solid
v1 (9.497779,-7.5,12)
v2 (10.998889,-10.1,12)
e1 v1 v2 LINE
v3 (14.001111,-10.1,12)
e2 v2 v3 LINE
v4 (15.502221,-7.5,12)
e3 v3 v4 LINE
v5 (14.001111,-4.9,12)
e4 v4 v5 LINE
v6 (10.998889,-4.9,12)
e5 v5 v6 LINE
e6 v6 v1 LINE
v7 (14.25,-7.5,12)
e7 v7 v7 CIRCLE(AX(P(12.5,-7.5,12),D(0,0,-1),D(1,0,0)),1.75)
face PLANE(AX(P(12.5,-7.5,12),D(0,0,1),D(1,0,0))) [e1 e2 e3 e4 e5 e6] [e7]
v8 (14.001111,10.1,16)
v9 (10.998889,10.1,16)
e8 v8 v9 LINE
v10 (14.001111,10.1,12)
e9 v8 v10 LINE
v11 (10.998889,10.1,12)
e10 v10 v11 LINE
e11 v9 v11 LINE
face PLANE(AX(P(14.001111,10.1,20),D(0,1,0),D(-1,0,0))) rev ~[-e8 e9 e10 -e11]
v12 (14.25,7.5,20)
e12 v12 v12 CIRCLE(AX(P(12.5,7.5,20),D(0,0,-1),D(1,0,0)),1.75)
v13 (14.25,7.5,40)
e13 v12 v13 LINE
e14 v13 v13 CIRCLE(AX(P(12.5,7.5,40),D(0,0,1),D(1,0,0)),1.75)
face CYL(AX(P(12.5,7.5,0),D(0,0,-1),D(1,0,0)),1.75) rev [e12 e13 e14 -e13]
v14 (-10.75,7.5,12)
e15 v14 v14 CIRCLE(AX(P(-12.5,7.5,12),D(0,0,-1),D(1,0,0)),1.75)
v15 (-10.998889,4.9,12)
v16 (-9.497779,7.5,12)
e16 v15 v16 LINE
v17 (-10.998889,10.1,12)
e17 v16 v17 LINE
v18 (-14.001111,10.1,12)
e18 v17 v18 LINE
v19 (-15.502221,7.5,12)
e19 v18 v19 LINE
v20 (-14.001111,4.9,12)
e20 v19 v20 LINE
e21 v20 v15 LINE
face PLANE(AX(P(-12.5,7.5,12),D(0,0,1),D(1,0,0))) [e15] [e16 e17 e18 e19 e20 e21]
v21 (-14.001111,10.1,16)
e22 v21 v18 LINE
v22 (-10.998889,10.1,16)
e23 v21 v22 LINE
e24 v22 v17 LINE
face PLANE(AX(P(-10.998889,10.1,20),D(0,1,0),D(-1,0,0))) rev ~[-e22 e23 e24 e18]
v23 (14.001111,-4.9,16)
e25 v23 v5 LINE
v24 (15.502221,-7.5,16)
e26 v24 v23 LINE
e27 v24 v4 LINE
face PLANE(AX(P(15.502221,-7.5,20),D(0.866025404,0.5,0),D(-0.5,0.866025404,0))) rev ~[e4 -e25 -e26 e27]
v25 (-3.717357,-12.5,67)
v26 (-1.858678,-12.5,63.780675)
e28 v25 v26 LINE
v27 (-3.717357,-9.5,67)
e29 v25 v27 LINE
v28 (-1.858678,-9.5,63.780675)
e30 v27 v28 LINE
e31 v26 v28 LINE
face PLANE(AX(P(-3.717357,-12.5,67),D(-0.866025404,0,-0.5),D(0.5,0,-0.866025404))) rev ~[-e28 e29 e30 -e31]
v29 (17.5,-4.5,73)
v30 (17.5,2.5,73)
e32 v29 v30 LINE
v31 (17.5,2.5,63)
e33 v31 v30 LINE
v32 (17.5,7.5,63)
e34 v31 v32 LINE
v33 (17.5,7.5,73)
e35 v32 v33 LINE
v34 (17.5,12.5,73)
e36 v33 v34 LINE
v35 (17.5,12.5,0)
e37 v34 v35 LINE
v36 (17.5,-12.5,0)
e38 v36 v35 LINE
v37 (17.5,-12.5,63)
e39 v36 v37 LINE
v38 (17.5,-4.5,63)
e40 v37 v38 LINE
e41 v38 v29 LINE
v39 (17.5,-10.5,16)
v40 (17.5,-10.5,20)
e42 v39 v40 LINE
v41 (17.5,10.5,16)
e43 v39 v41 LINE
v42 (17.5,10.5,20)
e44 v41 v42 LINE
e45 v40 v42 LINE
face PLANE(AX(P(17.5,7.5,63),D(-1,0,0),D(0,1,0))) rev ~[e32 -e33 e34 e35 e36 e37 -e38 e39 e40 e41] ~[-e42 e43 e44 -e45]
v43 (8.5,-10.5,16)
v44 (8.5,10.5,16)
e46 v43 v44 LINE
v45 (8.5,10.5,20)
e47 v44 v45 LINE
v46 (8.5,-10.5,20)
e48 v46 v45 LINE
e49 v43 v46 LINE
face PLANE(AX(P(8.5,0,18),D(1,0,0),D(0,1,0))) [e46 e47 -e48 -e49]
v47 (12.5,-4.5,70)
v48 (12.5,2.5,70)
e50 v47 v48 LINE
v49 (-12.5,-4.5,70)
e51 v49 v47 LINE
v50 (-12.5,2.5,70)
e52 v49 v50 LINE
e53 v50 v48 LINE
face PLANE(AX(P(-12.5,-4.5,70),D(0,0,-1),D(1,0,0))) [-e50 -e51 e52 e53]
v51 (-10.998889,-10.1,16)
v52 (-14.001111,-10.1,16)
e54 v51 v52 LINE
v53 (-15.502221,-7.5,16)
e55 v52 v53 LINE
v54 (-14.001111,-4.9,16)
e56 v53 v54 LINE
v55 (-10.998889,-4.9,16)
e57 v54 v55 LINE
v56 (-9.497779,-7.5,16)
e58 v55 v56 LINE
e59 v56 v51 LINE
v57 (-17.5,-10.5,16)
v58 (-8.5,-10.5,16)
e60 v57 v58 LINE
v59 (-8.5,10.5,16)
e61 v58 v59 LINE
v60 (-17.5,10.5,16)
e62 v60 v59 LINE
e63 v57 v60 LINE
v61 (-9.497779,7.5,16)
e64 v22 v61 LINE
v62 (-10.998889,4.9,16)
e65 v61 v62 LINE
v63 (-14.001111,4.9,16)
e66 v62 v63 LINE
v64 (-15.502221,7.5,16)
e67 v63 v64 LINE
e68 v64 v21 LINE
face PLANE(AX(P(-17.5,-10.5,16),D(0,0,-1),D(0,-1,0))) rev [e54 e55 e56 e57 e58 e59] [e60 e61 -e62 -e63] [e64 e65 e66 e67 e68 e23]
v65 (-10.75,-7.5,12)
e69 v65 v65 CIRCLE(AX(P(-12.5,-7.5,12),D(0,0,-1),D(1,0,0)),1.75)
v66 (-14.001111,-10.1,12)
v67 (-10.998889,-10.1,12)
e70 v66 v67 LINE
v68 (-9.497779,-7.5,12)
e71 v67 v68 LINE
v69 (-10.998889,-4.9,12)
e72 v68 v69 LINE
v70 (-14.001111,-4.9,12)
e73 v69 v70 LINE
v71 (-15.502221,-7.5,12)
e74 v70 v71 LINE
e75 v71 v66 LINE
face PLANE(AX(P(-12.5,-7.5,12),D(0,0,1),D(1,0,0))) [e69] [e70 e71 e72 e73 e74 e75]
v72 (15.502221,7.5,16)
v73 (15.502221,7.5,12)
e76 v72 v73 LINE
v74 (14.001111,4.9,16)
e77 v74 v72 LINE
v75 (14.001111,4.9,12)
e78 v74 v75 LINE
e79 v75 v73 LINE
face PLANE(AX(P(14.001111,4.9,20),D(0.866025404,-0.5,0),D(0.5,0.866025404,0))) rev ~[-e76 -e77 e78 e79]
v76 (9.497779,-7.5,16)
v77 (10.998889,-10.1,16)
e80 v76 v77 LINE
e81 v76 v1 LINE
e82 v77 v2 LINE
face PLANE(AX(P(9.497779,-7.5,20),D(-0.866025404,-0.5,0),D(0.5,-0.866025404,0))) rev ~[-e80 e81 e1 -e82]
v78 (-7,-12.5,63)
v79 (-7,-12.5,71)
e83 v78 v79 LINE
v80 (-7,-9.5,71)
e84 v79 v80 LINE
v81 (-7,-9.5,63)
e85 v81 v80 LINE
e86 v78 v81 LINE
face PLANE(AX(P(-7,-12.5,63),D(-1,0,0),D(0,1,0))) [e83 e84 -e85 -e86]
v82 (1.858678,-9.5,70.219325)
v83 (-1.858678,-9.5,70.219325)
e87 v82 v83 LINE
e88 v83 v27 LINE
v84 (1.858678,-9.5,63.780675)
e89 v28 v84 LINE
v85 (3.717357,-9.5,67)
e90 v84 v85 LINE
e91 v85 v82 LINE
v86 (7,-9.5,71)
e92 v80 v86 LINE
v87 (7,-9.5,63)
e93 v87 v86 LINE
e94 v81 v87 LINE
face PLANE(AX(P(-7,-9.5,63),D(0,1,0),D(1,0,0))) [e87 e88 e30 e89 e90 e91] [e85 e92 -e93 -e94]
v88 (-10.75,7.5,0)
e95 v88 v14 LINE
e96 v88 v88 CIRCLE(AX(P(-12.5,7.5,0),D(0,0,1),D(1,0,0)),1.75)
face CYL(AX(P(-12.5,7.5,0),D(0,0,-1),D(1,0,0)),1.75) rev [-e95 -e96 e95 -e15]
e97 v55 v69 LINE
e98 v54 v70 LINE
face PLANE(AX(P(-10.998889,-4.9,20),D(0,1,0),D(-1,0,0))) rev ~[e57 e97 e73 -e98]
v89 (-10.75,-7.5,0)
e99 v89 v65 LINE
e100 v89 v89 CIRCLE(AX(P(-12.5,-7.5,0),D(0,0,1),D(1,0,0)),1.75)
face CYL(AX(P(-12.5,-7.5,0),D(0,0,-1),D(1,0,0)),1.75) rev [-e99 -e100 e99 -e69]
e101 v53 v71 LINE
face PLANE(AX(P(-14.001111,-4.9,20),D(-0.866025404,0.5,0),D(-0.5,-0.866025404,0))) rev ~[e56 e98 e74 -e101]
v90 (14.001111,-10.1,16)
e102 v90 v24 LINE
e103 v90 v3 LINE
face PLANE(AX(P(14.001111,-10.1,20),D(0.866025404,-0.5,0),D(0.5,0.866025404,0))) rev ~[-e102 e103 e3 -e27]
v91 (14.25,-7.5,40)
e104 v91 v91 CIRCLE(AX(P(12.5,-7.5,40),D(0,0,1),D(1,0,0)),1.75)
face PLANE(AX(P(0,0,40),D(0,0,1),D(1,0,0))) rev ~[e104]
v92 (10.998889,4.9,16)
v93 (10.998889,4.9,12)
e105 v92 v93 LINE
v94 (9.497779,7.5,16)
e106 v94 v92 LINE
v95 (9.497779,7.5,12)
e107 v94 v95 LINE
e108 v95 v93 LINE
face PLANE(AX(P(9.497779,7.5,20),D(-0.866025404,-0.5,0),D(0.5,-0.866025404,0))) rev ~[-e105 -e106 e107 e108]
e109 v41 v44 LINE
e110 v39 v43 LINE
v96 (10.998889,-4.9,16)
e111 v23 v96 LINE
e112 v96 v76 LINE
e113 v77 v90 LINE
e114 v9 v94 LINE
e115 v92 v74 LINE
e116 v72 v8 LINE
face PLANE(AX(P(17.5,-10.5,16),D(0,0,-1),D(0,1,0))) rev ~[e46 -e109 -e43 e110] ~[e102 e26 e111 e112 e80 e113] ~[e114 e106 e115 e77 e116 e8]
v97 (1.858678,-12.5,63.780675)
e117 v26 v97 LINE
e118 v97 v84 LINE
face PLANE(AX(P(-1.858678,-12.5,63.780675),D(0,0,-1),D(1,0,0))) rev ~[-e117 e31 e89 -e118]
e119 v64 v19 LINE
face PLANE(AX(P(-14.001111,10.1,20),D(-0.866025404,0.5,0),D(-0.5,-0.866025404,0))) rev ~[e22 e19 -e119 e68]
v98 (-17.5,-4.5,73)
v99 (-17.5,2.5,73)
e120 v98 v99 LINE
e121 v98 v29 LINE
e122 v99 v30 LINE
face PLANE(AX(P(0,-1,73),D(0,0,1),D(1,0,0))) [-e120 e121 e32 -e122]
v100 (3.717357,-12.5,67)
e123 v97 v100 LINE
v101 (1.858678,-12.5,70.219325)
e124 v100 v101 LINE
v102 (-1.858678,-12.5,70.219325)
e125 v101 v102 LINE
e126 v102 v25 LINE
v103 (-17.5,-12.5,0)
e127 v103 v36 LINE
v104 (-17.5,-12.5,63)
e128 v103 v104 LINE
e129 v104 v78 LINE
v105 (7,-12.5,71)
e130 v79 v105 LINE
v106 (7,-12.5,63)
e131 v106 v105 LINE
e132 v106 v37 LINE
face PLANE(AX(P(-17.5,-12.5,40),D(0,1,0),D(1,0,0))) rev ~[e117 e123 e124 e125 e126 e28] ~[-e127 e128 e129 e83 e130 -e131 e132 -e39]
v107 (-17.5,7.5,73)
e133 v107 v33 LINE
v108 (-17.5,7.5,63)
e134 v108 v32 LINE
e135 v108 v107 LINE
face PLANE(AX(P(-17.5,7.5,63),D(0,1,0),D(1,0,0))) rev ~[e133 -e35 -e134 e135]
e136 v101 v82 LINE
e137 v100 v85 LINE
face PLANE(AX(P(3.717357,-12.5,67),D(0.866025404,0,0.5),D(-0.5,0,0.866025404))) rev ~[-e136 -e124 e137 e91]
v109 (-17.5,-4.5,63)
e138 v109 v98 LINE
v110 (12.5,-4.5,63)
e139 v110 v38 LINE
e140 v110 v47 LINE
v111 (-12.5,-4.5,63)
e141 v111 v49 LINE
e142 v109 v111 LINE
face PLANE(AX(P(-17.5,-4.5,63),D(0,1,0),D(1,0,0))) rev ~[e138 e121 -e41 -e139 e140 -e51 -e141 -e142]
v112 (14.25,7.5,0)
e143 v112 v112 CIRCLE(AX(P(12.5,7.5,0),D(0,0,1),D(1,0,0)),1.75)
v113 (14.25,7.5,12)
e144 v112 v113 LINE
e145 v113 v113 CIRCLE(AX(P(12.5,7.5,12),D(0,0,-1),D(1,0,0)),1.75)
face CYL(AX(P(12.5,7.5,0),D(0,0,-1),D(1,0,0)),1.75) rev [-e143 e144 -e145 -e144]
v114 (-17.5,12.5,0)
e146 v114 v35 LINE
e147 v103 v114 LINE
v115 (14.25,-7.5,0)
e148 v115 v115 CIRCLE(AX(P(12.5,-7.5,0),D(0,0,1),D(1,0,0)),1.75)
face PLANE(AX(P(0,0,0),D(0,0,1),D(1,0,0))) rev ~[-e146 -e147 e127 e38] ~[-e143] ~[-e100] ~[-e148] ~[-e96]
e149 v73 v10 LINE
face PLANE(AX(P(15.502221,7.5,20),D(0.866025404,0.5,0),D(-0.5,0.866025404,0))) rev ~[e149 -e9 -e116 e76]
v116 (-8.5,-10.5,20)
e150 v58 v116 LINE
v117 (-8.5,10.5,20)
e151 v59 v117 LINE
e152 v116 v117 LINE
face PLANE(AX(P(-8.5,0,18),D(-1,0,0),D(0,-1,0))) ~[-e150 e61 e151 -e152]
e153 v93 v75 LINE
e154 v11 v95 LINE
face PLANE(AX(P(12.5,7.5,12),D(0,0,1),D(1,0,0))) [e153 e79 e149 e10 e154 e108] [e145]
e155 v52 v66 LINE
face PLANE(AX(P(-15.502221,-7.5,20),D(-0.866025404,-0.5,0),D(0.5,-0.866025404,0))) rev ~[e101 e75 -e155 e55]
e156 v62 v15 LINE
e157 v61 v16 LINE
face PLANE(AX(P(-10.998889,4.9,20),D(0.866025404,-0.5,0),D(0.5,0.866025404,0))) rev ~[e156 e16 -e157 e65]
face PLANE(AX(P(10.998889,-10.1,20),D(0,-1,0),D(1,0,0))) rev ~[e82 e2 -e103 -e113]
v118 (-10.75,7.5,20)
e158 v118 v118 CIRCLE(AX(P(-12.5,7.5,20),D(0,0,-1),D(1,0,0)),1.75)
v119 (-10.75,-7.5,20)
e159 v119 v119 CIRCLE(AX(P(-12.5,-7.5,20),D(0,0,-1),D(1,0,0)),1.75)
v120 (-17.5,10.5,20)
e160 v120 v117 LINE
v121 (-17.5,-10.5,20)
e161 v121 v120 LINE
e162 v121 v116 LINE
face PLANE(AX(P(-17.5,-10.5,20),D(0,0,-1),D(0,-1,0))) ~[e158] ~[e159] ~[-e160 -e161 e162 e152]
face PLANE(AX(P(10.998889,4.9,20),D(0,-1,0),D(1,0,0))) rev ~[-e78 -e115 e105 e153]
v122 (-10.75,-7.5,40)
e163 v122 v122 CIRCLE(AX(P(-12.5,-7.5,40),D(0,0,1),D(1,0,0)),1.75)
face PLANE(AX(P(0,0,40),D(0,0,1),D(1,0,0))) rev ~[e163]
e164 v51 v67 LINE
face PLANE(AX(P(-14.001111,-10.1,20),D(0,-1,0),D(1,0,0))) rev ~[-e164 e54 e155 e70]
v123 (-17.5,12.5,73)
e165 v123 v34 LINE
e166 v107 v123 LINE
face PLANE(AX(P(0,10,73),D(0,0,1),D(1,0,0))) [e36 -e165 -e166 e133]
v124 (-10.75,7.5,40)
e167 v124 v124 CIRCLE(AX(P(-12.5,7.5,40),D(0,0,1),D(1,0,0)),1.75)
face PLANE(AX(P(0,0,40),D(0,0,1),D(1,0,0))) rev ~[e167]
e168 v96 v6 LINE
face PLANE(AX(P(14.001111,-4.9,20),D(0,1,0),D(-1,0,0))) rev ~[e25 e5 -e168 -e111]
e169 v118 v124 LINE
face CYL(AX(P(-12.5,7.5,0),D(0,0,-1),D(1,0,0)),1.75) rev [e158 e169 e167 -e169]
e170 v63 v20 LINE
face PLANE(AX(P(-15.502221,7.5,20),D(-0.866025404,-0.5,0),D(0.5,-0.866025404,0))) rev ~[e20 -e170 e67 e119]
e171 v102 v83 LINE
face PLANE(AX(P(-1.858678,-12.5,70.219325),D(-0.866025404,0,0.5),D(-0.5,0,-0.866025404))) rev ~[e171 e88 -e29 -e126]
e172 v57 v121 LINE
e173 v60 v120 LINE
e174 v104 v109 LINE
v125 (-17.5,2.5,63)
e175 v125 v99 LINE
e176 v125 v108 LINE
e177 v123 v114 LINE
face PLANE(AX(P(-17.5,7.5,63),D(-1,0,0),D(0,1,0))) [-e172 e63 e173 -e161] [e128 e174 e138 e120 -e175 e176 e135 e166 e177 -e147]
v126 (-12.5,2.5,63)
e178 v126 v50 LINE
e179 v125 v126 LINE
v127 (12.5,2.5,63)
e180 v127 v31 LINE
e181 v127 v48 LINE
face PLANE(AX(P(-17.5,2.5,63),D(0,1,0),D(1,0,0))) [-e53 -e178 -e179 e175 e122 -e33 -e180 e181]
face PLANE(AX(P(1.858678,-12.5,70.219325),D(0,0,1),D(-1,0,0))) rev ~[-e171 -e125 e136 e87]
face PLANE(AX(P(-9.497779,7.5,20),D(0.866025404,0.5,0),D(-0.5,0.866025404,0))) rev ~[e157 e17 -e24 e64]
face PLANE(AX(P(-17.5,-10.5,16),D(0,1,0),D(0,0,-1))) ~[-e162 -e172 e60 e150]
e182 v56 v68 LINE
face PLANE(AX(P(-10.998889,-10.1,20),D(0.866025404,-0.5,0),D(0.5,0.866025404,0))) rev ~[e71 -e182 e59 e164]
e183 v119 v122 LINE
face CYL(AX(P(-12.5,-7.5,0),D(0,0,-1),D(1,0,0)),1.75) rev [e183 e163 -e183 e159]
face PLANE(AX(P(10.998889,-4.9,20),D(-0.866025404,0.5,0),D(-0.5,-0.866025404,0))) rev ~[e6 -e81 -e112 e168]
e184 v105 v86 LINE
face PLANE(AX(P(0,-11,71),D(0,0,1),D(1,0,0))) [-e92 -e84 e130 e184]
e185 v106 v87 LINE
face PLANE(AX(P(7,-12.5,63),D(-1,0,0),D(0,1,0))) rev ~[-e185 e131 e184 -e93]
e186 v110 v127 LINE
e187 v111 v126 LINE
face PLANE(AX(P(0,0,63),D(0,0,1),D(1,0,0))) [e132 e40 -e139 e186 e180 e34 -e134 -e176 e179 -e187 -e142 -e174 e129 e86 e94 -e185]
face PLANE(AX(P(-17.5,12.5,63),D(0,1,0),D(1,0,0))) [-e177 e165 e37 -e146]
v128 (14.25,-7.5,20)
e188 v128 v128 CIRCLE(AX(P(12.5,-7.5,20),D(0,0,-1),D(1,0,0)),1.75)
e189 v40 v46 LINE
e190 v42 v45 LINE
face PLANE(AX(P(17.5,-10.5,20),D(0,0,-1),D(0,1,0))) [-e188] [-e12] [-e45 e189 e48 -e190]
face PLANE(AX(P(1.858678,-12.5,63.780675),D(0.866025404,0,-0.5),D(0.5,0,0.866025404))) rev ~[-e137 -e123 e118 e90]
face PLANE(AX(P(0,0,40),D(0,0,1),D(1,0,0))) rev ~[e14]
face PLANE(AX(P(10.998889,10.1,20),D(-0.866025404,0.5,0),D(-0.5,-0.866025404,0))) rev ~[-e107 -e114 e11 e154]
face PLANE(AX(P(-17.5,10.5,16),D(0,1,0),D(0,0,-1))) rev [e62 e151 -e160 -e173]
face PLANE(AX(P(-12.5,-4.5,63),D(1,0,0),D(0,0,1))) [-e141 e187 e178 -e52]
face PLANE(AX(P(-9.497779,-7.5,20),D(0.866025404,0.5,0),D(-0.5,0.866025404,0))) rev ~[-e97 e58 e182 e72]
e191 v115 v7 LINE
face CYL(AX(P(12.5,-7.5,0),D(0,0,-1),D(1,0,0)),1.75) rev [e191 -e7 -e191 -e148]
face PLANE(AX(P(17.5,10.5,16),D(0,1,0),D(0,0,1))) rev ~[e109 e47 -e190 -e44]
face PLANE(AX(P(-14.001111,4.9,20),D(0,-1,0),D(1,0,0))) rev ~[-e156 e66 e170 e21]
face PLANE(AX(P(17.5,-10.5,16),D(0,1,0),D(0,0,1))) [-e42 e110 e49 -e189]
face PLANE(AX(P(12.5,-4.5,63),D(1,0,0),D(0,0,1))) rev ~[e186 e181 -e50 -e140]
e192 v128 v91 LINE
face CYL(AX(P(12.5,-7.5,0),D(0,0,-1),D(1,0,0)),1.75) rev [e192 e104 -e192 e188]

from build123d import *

# Parameters (mm, degrees)
F0_W      = 35
F0_H      = 25
F0_R      = 1.75
F1_DEPTH  = 40
F2_W      = 35
F2_H      = 25
F3_DEPTH  = 23
F4_W      = 35
F4_H      = 5
F5_DEPTH  = 10
F6_W      = 35
F6_H      = 7
F7_DEPTH  = 10
F8_W      = 25
F8_H      = 7
F9_DEPTH  = 7
F10_W     = 14
F10_H     = 3
F11_DEPTH = 8
F15_DEPTH = 8
F16_W     = 21
F16_H     = 4
F17_DEPTH = 9
F18_DEPTH = 3


# Not quite as in the source:
# - a pattern or mirror of a feature is missing from the dataset's text; its kind, count and spacing are read off the source's solid


with BuildPart() as f1:
    # F0 (on Top) → F1 (new body)
    with BuildSketch(Plane.XY):
        Rectangle(F0_W, F0_H)
        with Locations((-12.5, -7.5)):
            Circle(F0_R, mode=Mode.SUBTRACT)
        with Locations((12.5, -7.5)):
            Circle(F0_R, mode=Mode.SUBTRACT)
        with Locations((-12.5, 7.5)):
            Circle(F0_R, mode=Mode.SUBTRACT)
        with Locations((12.5, 7.5)):
            Circle(F0_R, mode=Mode.SUBTRACT)
    extrude(amount=F1_DEPTH)

    # F2 (on face) → F3 (join)
    with BuildSketch(Plane.XY.offset(40)):
        Rectangle(F2_W, F2_H)
    extrude(amount=F3_DEPTH)

    # F4 (on face) → F5 (join)
    with BuildSketch(Plane.XY.offset(63)):
        with Locations((0, 10)):
            Rectangle(F4_W, F4_H)
    extrude(amount=F5_DEPTH)

    # F6 (on face) → F7 (join)
    with BuildSketch(Plane.XY.offset(63)):
        with Locations((0, -1)):
            Rectangle(F6_W, F6_H)
    extrude(amount=F7_DEPTH)

    # F8 (on face) → F9 (cut)
    with BuildSketch(Plane.XZ.offset(4.5)):
        with Locations((0, 66.5)):
            Rectangle(F8_W, F8_H)
    extrude(amount=-F9_DEPTH, mode=Mode.SUBTRACT)

    # F10 (on face) → F11 (join)
    with BuildSketch(Plane.XY.offset(63)):
        with Locations((0, -11)):
            Rectangle(F10_W, F10_H)
    extrude(amount=F11_DEPTH)

    # F14 (on offset) → F15 (cut)
    with BuildSketch(Plane.XY.offset(20)):
        Polygon((14.0011106999, -10.1), (15.5022213998, -7.5), (14.0011106999, -4.9), (10.9988893001, -4.9), (9.4977786002, -7.5), (10.9988893001, -10.1), align=None)
        Polygon((10.9988893001, 10.1), (9.4977786002, 7.5), (10.9988893001, 4.9), (14.0011106999, 4.9), (15.5022213998, 7.5), (14.0011106999, 10.1), align=None)
        Polygon((-10.9988893001, 4.9), (-9.4977786002, 7.5), (-10.9988893001, 10.1), (-14.0011106999, 10.1), (-15.5022213998, 7.5), (-14.0011106999, 4.9), align=None)
        Polygon((-14.0011106999, -10.1), (-10.9988893001, -10.1), (-9.4977786002, -7.5), (-10.9988893001, -4.9), (-14.0011106999, -4.9), (-15.5022213998, -7.5), align=None)
    extrude(amount=-F15_DEPTH, mode=Mode.SUBTRACT)

    # F16 (on face) → F17 (cut)
    with BuildSketch(Plane.YZ.offset(17.5)):
        with Locations((0, 18)):
            Rectangle(F16_W, F16_H)
    f17 = extrude(amount=-F17_DEPTH, mode=Mode.SUBTRACT)

    # F17_copies: F17 across plane
    add(f17.mirror(Plane(origin=(0, 0, 0), x_dir=(0, 0, -1), z_dir=(-1, 0, 0))), mode=Mode.SUBTRACT)

    # F12 (on face) → F18 (cut)
    with BuildSketch(Plane.XZ.offset(12.5)):
        Polygon((3.7173565517, 67), (1.8586782759, 70.2193252087), (-1.8586782759, 70.2193252087), (-3.7173565517, 67), (-1.8586782759, 63.7806747913), (1.8586782759, 63.7806747913), align=None)
    extrude(amount=-F18_DEPTH, mode=Mode.SUBTRACT)


solid = f1.part
